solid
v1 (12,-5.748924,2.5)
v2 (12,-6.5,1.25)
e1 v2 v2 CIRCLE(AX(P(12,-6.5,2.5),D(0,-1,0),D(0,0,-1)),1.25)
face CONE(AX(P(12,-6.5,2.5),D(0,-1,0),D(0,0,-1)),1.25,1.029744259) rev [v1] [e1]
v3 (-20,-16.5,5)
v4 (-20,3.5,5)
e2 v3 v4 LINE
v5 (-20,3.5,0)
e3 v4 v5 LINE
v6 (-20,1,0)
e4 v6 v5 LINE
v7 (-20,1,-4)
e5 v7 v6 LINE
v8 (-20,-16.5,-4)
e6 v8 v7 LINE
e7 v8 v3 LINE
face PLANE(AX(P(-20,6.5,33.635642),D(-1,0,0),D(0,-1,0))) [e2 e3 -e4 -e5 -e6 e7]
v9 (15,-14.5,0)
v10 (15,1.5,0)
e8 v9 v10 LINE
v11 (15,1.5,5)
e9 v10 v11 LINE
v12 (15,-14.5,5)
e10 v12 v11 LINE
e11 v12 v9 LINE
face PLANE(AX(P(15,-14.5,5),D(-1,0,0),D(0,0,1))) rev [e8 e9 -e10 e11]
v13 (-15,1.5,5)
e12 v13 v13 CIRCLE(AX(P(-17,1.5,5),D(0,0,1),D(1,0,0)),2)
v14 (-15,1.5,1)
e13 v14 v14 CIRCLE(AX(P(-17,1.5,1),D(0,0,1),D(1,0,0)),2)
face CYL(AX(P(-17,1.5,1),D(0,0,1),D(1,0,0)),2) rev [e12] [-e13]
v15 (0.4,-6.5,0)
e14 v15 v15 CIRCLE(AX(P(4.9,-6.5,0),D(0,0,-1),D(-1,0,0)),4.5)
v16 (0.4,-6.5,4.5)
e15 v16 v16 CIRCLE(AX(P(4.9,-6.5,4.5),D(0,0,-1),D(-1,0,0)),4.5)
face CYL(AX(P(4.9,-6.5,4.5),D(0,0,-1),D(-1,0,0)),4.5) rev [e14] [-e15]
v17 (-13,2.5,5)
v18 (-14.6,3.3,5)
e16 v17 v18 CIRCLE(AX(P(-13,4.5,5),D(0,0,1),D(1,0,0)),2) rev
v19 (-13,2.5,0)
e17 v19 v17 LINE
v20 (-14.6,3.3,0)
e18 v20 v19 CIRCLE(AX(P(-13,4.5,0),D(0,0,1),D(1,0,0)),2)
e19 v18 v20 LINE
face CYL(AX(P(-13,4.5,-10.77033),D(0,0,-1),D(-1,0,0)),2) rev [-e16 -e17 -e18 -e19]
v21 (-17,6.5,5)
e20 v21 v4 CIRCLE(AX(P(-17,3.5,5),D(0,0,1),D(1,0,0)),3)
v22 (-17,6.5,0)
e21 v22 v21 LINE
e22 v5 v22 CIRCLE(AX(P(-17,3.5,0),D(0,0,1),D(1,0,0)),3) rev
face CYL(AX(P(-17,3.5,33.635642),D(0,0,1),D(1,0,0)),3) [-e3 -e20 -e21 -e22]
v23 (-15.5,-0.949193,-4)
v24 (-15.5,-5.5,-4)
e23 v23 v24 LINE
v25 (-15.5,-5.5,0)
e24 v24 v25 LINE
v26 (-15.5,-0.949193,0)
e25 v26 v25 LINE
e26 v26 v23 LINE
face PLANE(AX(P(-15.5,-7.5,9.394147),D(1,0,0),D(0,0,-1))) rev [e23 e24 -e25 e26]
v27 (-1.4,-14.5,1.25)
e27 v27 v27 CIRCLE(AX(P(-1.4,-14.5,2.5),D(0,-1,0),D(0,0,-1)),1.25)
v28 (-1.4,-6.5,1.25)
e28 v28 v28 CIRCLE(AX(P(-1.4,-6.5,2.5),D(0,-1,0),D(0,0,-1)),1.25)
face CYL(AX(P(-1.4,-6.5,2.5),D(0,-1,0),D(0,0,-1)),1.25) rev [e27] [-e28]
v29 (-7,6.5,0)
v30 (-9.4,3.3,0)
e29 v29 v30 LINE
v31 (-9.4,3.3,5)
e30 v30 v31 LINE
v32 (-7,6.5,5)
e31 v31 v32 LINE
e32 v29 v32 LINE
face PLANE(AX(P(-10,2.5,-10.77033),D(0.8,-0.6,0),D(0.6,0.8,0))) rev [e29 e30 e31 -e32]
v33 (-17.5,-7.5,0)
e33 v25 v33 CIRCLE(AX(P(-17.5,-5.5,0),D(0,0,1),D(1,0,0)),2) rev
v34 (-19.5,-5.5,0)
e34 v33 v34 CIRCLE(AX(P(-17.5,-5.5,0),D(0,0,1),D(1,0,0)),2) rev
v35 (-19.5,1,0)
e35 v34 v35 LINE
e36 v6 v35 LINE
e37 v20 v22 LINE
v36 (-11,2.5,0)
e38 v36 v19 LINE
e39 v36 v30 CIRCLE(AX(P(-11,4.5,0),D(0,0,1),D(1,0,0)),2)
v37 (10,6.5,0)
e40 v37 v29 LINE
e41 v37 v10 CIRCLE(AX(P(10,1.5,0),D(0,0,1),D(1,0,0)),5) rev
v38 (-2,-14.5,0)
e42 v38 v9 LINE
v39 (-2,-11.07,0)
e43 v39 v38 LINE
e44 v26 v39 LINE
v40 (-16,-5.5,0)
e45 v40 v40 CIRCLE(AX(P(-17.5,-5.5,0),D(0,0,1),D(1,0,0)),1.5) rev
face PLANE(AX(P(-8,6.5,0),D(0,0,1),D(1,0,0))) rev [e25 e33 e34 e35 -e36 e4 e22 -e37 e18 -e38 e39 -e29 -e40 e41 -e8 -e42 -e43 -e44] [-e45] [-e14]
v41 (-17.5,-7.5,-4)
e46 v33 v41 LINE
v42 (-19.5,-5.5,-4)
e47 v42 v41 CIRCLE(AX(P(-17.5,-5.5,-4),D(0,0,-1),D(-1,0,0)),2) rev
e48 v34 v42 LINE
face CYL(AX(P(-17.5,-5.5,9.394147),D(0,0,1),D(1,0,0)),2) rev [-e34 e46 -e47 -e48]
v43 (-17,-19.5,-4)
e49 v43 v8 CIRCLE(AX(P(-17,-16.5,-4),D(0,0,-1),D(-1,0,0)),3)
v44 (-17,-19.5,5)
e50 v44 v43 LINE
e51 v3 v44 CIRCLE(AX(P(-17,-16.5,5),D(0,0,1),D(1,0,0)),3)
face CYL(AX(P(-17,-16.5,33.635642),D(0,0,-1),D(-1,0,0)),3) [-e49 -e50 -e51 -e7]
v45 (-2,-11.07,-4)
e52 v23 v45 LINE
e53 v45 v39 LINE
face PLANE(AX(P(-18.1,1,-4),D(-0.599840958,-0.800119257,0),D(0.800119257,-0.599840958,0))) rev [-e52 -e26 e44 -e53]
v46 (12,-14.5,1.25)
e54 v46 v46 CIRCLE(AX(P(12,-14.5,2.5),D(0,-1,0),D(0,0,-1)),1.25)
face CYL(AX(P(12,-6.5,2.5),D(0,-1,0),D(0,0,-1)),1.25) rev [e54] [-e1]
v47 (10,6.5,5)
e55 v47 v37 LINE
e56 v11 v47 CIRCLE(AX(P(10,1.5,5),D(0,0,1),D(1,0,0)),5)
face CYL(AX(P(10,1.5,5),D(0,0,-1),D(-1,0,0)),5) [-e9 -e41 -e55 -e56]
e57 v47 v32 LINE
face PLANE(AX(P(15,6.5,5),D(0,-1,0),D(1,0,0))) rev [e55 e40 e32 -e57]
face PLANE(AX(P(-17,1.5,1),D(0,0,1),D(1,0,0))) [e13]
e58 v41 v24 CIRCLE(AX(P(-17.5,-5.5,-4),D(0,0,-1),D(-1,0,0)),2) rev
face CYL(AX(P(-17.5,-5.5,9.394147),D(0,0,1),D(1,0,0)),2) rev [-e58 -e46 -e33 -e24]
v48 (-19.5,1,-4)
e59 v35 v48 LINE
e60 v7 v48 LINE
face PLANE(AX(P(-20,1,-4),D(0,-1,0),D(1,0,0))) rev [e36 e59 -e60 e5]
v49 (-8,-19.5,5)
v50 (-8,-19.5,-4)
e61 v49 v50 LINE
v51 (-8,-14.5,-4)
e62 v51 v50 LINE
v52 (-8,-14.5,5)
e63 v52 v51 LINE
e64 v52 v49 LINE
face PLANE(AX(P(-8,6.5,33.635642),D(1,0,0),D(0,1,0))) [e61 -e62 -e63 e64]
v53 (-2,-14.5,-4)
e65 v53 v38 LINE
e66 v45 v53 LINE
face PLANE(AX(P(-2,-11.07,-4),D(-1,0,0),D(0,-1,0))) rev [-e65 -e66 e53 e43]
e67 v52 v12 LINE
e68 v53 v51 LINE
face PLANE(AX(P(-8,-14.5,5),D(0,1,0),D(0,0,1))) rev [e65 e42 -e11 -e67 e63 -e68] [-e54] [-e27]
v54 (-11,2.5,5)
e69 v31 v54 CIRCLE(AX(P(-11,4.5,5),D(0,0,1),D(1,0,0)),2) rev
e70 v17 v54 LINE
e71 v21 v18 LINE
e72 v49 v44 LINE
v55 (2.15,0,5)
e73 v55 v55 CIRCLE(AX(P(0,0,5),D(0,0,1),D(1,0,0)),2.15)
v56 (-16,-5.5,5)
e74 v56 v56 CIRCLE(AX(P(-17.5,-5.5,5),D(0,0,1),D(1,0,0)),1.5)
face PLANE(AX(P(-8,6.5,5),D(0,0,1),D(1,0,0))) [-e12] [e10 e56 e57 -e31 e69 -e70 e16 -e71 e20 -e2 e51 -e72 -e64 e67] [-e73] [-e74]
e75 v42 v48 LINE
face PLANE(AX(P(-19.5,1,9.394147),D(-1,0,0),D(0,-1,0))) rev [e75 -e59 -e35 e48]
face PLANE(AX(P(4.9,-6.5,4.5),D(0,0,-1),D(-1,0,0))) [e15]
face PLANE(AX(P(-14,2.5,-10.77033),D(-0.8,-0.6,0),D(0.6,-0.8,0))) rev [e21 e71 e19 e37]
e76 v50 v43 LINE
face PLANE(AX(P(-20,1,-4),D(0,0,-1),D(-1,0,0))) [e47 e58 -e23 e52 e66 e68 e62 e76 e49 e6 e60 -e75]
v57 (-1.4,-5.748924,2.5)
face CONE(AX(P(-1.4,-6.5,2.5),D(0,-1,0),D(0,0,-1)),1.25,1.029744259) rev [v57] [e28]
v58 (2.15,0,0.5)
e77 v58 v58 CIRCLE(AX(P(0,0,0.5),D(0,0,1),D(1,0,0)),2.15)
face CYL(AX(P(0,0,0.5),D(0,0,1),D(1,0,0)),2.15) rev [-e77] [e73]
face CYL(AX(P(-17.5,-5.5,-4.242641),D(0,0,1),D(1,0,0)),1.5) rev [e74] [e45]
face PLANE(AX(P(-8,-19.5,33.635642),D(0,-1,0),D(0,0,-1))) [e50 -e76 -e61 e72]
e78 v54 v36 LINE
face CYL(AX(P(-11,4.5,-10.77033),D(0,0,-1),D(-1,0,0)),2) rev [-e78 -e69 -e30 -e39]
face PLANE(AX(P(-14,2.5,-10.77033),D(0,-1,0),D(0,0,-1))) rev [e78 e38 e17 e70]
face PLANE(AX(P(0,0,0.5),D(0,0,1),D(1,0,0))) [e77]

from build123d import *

# Parameters (mm, degrees)
SKETCH1_W             = 23
SKETCH1_H             = 21
EXTRUDE1_DEPTH        = 5
SKETCH2_R             = 2.15
EXTRUDE2_DEPTH        = 4.5
SKETCH4_R             = 1.25
EXTRUDE4_DEPTH        = 8
FILLET1_R             = 5
SKETCH6_R             = 4.5
EXTRUDE6_DEPTH        = 4.5
SKETCH9_W             = 12
SKETCH9_H             = 26
EXTRUDE9_DEPTH        = 5
SKETCH10_R            = 2
EXTRUDE10_DEPTH       = 4
SKETCH11_R            = 1.5
EXTRUDE11_DEPTH       = 5
M3_TAPPED_HOLE1_D     = 2.5
M3_TAPPED_HOLE1_DEPTH = 8
M3_TAPPED_HOLE1_TIP   = 0.751075774
EXTRUDE12_DEPTH       = 4
FILLET3_R             = 3
EXTRUDE14_DEPTH       = 4
FILLET4_R             = 2
EXTRUDE15_DEPTH       = 5
FILLET6_R             = 2


with BuildPart() as part:
    # Sketch1 → Extrude1 (new body)
    with BuildSketch(Plane.XY):
        with Locations((3.5, -4)):
            Rectangle(SKETCH1_W, SKETCH1_H)
    extrude(amount=EXTRUDE1_DEPTH)

    # Sketch2 → Extrude2 (cut)
    with BuildSketch(Plane.XY.offset(5)):
        Circle(SKETCH2_R)
    extrude(amount=-EXTRUDE2_DEPTH, mode=Mode.SUBTRACT)

    # Sketch4 → Extrude4 (cut)
    with BuildSketch(Plane.XZ.offset(14.5)):
        with Locations(Location((-1.4, 2.5, 0), (0, 0, 270))):
            Circle(SKETCH4_R)
        with Locations(Location((12, 2.5, 0), (0, 0, 270))):
            Circle(SKETCH4_R)
    extrude(amount=-EXTRUDE4_DEPTH, mode=Mode.SUBTRACT)

    # Fillet1
    fillet1_edges = [part.edges().sort_by_distance(p)[0] for p in [
        (15, 6.5, 2.5),
    ]]
    fillet(fillet1_edges, radius=FILLET1_R)

    # Sketch6 → Extrude6 (cut)
    with BuildSketch(Plane(origin=(0, 0, 0), x_dir=(-1, 0, 0), z_dir=(0, 0, -1))):
        with Locations((-4.9, -6.5)):
            Circle(SKETCH6_R)
    extrude(amount=-EXTRUDE6_DEPTH, mode=Mode.SUBTRACT)

    # Sketch9 → Extrude9 (add)
    with BuildSketch(Plane(origin=(0, 0, 0), x_dir=(-1, 0, 0), z_dir=(0, 0, -1))):
        with Locations((14, -6.5)):
            Rectangle(SKETCH9_W, SKETCH9_H)
    extrude(amount=-EXTRUDE9_DEPTH)

    # Sketch10 → Extrude10 (cut)
    with BuildSketch(Plane.XY.offset(5)):
        with Locations((-17, 1.5)):
            Circle(SKETCH10_R)
    extrude(amount=-EXTRUDE10_DEPTH, mode=Mode.SUBTRACT)

    # Sketch11 → Extrude11 (cut)
    with BuildSketch(Plane.XY.offset(5)):
        with Locations((-17.5, -5.5)):
            Circle(SKETCH11_R)
    extrude(amount=-EXTRUDE11_DEPTH, mode=Mode.SUBTRACT)

    # M3 Tapped Hole1
    with Locations(Plane(origin=(-1.4, -14.5, 2.5), x_dir=(0, 0, -1), z_dir=(0, -1, 0))):
        with Locations((0, 0), (0, 13.4)):
            Hole(M3_TAPPED_HOLE1_D / 2, depth=M3_TAPPED_HOLE1_DEPTH)
            with Locations((0, 0, -(M3_TAPPED_HOLE1_DEPTH + M3_TAPPED_HOLE1_TIP / 2))):  # 118° drill point
                Cone(0, M3_TAPPED_HOLE1_D / 2, M3_TAPPED_HOLE1_TIP, mode=Mode.SUBTRACT)

    # Sketch13 → Extrude12 (add)
    with BuildSketch(Plane(origin=(0, 0, 0), x_dir=(-1, 0, 0), z_dir=(0, 0, -1))):
        Polygon((20, -19.5), (8, -19.5), (8, -14.5), (2, -14.5), (2, -11.07), (18.1, 1), (20, 1), align=None)
    extrude(amount=EXTRUDE12_DEPTH)

    # Fillet3
    fillet3_edges = [part.edges().sort_by_distance(p)[0] for p in [
        (-20, -19.5, 0.5),
        (-20, 6.5, 2.5),
    ]]
    fillet(fillet3_edges, radius=FILLET3_R)

    # Sketch14 → Extrude14 (cut)
    with BuildSketch(Plane(origin=(0, 0, -4), x_dir=(-1, 0, 0), z_dir=(0, 0, -1))):
        Polygon((19.5, 1), (19.5, -7.5), (15.5, -7.5), (15.5, -0.949192547), (18.1, 1), align=None)
    extrude(amount=-EXTRUDE14_DEPTH, mode=Mode.SUBTRACT)

    # Fillet4
    fillet4_edges = [part.edges().sort_by_distance(p)[0] for p in [
        (-19.5, -7.5, -2),
        (-15.5, -7.5, -2),
    ]]
    fillet(fillet4_edges, radius=FILLET4_R - 0.0001)  # a hair under: the kernel refuses the full size

    # Sketch15 → Extrude15 (cut)
    with BuildSketch(Plane.XY.offset(5)):
        Polygon((-14, 2.5), (-17, 6.5), (-7, 6.5), (-10, 2.5), align=None)
    extrude(amount=-EXTRUDE15_DEPTH, mode=Mode.SUBTRACT)

    # Fillet6
    fillet6_edges = [part.edges().sort_by_distance(p)[0] for p in [
        (-10, 2.5, 2.5),
        (-14, 2.5, 2.5),
    ]]
    fillet(fillet6_edges, radius=FILLET6_R)


solid = part.part
